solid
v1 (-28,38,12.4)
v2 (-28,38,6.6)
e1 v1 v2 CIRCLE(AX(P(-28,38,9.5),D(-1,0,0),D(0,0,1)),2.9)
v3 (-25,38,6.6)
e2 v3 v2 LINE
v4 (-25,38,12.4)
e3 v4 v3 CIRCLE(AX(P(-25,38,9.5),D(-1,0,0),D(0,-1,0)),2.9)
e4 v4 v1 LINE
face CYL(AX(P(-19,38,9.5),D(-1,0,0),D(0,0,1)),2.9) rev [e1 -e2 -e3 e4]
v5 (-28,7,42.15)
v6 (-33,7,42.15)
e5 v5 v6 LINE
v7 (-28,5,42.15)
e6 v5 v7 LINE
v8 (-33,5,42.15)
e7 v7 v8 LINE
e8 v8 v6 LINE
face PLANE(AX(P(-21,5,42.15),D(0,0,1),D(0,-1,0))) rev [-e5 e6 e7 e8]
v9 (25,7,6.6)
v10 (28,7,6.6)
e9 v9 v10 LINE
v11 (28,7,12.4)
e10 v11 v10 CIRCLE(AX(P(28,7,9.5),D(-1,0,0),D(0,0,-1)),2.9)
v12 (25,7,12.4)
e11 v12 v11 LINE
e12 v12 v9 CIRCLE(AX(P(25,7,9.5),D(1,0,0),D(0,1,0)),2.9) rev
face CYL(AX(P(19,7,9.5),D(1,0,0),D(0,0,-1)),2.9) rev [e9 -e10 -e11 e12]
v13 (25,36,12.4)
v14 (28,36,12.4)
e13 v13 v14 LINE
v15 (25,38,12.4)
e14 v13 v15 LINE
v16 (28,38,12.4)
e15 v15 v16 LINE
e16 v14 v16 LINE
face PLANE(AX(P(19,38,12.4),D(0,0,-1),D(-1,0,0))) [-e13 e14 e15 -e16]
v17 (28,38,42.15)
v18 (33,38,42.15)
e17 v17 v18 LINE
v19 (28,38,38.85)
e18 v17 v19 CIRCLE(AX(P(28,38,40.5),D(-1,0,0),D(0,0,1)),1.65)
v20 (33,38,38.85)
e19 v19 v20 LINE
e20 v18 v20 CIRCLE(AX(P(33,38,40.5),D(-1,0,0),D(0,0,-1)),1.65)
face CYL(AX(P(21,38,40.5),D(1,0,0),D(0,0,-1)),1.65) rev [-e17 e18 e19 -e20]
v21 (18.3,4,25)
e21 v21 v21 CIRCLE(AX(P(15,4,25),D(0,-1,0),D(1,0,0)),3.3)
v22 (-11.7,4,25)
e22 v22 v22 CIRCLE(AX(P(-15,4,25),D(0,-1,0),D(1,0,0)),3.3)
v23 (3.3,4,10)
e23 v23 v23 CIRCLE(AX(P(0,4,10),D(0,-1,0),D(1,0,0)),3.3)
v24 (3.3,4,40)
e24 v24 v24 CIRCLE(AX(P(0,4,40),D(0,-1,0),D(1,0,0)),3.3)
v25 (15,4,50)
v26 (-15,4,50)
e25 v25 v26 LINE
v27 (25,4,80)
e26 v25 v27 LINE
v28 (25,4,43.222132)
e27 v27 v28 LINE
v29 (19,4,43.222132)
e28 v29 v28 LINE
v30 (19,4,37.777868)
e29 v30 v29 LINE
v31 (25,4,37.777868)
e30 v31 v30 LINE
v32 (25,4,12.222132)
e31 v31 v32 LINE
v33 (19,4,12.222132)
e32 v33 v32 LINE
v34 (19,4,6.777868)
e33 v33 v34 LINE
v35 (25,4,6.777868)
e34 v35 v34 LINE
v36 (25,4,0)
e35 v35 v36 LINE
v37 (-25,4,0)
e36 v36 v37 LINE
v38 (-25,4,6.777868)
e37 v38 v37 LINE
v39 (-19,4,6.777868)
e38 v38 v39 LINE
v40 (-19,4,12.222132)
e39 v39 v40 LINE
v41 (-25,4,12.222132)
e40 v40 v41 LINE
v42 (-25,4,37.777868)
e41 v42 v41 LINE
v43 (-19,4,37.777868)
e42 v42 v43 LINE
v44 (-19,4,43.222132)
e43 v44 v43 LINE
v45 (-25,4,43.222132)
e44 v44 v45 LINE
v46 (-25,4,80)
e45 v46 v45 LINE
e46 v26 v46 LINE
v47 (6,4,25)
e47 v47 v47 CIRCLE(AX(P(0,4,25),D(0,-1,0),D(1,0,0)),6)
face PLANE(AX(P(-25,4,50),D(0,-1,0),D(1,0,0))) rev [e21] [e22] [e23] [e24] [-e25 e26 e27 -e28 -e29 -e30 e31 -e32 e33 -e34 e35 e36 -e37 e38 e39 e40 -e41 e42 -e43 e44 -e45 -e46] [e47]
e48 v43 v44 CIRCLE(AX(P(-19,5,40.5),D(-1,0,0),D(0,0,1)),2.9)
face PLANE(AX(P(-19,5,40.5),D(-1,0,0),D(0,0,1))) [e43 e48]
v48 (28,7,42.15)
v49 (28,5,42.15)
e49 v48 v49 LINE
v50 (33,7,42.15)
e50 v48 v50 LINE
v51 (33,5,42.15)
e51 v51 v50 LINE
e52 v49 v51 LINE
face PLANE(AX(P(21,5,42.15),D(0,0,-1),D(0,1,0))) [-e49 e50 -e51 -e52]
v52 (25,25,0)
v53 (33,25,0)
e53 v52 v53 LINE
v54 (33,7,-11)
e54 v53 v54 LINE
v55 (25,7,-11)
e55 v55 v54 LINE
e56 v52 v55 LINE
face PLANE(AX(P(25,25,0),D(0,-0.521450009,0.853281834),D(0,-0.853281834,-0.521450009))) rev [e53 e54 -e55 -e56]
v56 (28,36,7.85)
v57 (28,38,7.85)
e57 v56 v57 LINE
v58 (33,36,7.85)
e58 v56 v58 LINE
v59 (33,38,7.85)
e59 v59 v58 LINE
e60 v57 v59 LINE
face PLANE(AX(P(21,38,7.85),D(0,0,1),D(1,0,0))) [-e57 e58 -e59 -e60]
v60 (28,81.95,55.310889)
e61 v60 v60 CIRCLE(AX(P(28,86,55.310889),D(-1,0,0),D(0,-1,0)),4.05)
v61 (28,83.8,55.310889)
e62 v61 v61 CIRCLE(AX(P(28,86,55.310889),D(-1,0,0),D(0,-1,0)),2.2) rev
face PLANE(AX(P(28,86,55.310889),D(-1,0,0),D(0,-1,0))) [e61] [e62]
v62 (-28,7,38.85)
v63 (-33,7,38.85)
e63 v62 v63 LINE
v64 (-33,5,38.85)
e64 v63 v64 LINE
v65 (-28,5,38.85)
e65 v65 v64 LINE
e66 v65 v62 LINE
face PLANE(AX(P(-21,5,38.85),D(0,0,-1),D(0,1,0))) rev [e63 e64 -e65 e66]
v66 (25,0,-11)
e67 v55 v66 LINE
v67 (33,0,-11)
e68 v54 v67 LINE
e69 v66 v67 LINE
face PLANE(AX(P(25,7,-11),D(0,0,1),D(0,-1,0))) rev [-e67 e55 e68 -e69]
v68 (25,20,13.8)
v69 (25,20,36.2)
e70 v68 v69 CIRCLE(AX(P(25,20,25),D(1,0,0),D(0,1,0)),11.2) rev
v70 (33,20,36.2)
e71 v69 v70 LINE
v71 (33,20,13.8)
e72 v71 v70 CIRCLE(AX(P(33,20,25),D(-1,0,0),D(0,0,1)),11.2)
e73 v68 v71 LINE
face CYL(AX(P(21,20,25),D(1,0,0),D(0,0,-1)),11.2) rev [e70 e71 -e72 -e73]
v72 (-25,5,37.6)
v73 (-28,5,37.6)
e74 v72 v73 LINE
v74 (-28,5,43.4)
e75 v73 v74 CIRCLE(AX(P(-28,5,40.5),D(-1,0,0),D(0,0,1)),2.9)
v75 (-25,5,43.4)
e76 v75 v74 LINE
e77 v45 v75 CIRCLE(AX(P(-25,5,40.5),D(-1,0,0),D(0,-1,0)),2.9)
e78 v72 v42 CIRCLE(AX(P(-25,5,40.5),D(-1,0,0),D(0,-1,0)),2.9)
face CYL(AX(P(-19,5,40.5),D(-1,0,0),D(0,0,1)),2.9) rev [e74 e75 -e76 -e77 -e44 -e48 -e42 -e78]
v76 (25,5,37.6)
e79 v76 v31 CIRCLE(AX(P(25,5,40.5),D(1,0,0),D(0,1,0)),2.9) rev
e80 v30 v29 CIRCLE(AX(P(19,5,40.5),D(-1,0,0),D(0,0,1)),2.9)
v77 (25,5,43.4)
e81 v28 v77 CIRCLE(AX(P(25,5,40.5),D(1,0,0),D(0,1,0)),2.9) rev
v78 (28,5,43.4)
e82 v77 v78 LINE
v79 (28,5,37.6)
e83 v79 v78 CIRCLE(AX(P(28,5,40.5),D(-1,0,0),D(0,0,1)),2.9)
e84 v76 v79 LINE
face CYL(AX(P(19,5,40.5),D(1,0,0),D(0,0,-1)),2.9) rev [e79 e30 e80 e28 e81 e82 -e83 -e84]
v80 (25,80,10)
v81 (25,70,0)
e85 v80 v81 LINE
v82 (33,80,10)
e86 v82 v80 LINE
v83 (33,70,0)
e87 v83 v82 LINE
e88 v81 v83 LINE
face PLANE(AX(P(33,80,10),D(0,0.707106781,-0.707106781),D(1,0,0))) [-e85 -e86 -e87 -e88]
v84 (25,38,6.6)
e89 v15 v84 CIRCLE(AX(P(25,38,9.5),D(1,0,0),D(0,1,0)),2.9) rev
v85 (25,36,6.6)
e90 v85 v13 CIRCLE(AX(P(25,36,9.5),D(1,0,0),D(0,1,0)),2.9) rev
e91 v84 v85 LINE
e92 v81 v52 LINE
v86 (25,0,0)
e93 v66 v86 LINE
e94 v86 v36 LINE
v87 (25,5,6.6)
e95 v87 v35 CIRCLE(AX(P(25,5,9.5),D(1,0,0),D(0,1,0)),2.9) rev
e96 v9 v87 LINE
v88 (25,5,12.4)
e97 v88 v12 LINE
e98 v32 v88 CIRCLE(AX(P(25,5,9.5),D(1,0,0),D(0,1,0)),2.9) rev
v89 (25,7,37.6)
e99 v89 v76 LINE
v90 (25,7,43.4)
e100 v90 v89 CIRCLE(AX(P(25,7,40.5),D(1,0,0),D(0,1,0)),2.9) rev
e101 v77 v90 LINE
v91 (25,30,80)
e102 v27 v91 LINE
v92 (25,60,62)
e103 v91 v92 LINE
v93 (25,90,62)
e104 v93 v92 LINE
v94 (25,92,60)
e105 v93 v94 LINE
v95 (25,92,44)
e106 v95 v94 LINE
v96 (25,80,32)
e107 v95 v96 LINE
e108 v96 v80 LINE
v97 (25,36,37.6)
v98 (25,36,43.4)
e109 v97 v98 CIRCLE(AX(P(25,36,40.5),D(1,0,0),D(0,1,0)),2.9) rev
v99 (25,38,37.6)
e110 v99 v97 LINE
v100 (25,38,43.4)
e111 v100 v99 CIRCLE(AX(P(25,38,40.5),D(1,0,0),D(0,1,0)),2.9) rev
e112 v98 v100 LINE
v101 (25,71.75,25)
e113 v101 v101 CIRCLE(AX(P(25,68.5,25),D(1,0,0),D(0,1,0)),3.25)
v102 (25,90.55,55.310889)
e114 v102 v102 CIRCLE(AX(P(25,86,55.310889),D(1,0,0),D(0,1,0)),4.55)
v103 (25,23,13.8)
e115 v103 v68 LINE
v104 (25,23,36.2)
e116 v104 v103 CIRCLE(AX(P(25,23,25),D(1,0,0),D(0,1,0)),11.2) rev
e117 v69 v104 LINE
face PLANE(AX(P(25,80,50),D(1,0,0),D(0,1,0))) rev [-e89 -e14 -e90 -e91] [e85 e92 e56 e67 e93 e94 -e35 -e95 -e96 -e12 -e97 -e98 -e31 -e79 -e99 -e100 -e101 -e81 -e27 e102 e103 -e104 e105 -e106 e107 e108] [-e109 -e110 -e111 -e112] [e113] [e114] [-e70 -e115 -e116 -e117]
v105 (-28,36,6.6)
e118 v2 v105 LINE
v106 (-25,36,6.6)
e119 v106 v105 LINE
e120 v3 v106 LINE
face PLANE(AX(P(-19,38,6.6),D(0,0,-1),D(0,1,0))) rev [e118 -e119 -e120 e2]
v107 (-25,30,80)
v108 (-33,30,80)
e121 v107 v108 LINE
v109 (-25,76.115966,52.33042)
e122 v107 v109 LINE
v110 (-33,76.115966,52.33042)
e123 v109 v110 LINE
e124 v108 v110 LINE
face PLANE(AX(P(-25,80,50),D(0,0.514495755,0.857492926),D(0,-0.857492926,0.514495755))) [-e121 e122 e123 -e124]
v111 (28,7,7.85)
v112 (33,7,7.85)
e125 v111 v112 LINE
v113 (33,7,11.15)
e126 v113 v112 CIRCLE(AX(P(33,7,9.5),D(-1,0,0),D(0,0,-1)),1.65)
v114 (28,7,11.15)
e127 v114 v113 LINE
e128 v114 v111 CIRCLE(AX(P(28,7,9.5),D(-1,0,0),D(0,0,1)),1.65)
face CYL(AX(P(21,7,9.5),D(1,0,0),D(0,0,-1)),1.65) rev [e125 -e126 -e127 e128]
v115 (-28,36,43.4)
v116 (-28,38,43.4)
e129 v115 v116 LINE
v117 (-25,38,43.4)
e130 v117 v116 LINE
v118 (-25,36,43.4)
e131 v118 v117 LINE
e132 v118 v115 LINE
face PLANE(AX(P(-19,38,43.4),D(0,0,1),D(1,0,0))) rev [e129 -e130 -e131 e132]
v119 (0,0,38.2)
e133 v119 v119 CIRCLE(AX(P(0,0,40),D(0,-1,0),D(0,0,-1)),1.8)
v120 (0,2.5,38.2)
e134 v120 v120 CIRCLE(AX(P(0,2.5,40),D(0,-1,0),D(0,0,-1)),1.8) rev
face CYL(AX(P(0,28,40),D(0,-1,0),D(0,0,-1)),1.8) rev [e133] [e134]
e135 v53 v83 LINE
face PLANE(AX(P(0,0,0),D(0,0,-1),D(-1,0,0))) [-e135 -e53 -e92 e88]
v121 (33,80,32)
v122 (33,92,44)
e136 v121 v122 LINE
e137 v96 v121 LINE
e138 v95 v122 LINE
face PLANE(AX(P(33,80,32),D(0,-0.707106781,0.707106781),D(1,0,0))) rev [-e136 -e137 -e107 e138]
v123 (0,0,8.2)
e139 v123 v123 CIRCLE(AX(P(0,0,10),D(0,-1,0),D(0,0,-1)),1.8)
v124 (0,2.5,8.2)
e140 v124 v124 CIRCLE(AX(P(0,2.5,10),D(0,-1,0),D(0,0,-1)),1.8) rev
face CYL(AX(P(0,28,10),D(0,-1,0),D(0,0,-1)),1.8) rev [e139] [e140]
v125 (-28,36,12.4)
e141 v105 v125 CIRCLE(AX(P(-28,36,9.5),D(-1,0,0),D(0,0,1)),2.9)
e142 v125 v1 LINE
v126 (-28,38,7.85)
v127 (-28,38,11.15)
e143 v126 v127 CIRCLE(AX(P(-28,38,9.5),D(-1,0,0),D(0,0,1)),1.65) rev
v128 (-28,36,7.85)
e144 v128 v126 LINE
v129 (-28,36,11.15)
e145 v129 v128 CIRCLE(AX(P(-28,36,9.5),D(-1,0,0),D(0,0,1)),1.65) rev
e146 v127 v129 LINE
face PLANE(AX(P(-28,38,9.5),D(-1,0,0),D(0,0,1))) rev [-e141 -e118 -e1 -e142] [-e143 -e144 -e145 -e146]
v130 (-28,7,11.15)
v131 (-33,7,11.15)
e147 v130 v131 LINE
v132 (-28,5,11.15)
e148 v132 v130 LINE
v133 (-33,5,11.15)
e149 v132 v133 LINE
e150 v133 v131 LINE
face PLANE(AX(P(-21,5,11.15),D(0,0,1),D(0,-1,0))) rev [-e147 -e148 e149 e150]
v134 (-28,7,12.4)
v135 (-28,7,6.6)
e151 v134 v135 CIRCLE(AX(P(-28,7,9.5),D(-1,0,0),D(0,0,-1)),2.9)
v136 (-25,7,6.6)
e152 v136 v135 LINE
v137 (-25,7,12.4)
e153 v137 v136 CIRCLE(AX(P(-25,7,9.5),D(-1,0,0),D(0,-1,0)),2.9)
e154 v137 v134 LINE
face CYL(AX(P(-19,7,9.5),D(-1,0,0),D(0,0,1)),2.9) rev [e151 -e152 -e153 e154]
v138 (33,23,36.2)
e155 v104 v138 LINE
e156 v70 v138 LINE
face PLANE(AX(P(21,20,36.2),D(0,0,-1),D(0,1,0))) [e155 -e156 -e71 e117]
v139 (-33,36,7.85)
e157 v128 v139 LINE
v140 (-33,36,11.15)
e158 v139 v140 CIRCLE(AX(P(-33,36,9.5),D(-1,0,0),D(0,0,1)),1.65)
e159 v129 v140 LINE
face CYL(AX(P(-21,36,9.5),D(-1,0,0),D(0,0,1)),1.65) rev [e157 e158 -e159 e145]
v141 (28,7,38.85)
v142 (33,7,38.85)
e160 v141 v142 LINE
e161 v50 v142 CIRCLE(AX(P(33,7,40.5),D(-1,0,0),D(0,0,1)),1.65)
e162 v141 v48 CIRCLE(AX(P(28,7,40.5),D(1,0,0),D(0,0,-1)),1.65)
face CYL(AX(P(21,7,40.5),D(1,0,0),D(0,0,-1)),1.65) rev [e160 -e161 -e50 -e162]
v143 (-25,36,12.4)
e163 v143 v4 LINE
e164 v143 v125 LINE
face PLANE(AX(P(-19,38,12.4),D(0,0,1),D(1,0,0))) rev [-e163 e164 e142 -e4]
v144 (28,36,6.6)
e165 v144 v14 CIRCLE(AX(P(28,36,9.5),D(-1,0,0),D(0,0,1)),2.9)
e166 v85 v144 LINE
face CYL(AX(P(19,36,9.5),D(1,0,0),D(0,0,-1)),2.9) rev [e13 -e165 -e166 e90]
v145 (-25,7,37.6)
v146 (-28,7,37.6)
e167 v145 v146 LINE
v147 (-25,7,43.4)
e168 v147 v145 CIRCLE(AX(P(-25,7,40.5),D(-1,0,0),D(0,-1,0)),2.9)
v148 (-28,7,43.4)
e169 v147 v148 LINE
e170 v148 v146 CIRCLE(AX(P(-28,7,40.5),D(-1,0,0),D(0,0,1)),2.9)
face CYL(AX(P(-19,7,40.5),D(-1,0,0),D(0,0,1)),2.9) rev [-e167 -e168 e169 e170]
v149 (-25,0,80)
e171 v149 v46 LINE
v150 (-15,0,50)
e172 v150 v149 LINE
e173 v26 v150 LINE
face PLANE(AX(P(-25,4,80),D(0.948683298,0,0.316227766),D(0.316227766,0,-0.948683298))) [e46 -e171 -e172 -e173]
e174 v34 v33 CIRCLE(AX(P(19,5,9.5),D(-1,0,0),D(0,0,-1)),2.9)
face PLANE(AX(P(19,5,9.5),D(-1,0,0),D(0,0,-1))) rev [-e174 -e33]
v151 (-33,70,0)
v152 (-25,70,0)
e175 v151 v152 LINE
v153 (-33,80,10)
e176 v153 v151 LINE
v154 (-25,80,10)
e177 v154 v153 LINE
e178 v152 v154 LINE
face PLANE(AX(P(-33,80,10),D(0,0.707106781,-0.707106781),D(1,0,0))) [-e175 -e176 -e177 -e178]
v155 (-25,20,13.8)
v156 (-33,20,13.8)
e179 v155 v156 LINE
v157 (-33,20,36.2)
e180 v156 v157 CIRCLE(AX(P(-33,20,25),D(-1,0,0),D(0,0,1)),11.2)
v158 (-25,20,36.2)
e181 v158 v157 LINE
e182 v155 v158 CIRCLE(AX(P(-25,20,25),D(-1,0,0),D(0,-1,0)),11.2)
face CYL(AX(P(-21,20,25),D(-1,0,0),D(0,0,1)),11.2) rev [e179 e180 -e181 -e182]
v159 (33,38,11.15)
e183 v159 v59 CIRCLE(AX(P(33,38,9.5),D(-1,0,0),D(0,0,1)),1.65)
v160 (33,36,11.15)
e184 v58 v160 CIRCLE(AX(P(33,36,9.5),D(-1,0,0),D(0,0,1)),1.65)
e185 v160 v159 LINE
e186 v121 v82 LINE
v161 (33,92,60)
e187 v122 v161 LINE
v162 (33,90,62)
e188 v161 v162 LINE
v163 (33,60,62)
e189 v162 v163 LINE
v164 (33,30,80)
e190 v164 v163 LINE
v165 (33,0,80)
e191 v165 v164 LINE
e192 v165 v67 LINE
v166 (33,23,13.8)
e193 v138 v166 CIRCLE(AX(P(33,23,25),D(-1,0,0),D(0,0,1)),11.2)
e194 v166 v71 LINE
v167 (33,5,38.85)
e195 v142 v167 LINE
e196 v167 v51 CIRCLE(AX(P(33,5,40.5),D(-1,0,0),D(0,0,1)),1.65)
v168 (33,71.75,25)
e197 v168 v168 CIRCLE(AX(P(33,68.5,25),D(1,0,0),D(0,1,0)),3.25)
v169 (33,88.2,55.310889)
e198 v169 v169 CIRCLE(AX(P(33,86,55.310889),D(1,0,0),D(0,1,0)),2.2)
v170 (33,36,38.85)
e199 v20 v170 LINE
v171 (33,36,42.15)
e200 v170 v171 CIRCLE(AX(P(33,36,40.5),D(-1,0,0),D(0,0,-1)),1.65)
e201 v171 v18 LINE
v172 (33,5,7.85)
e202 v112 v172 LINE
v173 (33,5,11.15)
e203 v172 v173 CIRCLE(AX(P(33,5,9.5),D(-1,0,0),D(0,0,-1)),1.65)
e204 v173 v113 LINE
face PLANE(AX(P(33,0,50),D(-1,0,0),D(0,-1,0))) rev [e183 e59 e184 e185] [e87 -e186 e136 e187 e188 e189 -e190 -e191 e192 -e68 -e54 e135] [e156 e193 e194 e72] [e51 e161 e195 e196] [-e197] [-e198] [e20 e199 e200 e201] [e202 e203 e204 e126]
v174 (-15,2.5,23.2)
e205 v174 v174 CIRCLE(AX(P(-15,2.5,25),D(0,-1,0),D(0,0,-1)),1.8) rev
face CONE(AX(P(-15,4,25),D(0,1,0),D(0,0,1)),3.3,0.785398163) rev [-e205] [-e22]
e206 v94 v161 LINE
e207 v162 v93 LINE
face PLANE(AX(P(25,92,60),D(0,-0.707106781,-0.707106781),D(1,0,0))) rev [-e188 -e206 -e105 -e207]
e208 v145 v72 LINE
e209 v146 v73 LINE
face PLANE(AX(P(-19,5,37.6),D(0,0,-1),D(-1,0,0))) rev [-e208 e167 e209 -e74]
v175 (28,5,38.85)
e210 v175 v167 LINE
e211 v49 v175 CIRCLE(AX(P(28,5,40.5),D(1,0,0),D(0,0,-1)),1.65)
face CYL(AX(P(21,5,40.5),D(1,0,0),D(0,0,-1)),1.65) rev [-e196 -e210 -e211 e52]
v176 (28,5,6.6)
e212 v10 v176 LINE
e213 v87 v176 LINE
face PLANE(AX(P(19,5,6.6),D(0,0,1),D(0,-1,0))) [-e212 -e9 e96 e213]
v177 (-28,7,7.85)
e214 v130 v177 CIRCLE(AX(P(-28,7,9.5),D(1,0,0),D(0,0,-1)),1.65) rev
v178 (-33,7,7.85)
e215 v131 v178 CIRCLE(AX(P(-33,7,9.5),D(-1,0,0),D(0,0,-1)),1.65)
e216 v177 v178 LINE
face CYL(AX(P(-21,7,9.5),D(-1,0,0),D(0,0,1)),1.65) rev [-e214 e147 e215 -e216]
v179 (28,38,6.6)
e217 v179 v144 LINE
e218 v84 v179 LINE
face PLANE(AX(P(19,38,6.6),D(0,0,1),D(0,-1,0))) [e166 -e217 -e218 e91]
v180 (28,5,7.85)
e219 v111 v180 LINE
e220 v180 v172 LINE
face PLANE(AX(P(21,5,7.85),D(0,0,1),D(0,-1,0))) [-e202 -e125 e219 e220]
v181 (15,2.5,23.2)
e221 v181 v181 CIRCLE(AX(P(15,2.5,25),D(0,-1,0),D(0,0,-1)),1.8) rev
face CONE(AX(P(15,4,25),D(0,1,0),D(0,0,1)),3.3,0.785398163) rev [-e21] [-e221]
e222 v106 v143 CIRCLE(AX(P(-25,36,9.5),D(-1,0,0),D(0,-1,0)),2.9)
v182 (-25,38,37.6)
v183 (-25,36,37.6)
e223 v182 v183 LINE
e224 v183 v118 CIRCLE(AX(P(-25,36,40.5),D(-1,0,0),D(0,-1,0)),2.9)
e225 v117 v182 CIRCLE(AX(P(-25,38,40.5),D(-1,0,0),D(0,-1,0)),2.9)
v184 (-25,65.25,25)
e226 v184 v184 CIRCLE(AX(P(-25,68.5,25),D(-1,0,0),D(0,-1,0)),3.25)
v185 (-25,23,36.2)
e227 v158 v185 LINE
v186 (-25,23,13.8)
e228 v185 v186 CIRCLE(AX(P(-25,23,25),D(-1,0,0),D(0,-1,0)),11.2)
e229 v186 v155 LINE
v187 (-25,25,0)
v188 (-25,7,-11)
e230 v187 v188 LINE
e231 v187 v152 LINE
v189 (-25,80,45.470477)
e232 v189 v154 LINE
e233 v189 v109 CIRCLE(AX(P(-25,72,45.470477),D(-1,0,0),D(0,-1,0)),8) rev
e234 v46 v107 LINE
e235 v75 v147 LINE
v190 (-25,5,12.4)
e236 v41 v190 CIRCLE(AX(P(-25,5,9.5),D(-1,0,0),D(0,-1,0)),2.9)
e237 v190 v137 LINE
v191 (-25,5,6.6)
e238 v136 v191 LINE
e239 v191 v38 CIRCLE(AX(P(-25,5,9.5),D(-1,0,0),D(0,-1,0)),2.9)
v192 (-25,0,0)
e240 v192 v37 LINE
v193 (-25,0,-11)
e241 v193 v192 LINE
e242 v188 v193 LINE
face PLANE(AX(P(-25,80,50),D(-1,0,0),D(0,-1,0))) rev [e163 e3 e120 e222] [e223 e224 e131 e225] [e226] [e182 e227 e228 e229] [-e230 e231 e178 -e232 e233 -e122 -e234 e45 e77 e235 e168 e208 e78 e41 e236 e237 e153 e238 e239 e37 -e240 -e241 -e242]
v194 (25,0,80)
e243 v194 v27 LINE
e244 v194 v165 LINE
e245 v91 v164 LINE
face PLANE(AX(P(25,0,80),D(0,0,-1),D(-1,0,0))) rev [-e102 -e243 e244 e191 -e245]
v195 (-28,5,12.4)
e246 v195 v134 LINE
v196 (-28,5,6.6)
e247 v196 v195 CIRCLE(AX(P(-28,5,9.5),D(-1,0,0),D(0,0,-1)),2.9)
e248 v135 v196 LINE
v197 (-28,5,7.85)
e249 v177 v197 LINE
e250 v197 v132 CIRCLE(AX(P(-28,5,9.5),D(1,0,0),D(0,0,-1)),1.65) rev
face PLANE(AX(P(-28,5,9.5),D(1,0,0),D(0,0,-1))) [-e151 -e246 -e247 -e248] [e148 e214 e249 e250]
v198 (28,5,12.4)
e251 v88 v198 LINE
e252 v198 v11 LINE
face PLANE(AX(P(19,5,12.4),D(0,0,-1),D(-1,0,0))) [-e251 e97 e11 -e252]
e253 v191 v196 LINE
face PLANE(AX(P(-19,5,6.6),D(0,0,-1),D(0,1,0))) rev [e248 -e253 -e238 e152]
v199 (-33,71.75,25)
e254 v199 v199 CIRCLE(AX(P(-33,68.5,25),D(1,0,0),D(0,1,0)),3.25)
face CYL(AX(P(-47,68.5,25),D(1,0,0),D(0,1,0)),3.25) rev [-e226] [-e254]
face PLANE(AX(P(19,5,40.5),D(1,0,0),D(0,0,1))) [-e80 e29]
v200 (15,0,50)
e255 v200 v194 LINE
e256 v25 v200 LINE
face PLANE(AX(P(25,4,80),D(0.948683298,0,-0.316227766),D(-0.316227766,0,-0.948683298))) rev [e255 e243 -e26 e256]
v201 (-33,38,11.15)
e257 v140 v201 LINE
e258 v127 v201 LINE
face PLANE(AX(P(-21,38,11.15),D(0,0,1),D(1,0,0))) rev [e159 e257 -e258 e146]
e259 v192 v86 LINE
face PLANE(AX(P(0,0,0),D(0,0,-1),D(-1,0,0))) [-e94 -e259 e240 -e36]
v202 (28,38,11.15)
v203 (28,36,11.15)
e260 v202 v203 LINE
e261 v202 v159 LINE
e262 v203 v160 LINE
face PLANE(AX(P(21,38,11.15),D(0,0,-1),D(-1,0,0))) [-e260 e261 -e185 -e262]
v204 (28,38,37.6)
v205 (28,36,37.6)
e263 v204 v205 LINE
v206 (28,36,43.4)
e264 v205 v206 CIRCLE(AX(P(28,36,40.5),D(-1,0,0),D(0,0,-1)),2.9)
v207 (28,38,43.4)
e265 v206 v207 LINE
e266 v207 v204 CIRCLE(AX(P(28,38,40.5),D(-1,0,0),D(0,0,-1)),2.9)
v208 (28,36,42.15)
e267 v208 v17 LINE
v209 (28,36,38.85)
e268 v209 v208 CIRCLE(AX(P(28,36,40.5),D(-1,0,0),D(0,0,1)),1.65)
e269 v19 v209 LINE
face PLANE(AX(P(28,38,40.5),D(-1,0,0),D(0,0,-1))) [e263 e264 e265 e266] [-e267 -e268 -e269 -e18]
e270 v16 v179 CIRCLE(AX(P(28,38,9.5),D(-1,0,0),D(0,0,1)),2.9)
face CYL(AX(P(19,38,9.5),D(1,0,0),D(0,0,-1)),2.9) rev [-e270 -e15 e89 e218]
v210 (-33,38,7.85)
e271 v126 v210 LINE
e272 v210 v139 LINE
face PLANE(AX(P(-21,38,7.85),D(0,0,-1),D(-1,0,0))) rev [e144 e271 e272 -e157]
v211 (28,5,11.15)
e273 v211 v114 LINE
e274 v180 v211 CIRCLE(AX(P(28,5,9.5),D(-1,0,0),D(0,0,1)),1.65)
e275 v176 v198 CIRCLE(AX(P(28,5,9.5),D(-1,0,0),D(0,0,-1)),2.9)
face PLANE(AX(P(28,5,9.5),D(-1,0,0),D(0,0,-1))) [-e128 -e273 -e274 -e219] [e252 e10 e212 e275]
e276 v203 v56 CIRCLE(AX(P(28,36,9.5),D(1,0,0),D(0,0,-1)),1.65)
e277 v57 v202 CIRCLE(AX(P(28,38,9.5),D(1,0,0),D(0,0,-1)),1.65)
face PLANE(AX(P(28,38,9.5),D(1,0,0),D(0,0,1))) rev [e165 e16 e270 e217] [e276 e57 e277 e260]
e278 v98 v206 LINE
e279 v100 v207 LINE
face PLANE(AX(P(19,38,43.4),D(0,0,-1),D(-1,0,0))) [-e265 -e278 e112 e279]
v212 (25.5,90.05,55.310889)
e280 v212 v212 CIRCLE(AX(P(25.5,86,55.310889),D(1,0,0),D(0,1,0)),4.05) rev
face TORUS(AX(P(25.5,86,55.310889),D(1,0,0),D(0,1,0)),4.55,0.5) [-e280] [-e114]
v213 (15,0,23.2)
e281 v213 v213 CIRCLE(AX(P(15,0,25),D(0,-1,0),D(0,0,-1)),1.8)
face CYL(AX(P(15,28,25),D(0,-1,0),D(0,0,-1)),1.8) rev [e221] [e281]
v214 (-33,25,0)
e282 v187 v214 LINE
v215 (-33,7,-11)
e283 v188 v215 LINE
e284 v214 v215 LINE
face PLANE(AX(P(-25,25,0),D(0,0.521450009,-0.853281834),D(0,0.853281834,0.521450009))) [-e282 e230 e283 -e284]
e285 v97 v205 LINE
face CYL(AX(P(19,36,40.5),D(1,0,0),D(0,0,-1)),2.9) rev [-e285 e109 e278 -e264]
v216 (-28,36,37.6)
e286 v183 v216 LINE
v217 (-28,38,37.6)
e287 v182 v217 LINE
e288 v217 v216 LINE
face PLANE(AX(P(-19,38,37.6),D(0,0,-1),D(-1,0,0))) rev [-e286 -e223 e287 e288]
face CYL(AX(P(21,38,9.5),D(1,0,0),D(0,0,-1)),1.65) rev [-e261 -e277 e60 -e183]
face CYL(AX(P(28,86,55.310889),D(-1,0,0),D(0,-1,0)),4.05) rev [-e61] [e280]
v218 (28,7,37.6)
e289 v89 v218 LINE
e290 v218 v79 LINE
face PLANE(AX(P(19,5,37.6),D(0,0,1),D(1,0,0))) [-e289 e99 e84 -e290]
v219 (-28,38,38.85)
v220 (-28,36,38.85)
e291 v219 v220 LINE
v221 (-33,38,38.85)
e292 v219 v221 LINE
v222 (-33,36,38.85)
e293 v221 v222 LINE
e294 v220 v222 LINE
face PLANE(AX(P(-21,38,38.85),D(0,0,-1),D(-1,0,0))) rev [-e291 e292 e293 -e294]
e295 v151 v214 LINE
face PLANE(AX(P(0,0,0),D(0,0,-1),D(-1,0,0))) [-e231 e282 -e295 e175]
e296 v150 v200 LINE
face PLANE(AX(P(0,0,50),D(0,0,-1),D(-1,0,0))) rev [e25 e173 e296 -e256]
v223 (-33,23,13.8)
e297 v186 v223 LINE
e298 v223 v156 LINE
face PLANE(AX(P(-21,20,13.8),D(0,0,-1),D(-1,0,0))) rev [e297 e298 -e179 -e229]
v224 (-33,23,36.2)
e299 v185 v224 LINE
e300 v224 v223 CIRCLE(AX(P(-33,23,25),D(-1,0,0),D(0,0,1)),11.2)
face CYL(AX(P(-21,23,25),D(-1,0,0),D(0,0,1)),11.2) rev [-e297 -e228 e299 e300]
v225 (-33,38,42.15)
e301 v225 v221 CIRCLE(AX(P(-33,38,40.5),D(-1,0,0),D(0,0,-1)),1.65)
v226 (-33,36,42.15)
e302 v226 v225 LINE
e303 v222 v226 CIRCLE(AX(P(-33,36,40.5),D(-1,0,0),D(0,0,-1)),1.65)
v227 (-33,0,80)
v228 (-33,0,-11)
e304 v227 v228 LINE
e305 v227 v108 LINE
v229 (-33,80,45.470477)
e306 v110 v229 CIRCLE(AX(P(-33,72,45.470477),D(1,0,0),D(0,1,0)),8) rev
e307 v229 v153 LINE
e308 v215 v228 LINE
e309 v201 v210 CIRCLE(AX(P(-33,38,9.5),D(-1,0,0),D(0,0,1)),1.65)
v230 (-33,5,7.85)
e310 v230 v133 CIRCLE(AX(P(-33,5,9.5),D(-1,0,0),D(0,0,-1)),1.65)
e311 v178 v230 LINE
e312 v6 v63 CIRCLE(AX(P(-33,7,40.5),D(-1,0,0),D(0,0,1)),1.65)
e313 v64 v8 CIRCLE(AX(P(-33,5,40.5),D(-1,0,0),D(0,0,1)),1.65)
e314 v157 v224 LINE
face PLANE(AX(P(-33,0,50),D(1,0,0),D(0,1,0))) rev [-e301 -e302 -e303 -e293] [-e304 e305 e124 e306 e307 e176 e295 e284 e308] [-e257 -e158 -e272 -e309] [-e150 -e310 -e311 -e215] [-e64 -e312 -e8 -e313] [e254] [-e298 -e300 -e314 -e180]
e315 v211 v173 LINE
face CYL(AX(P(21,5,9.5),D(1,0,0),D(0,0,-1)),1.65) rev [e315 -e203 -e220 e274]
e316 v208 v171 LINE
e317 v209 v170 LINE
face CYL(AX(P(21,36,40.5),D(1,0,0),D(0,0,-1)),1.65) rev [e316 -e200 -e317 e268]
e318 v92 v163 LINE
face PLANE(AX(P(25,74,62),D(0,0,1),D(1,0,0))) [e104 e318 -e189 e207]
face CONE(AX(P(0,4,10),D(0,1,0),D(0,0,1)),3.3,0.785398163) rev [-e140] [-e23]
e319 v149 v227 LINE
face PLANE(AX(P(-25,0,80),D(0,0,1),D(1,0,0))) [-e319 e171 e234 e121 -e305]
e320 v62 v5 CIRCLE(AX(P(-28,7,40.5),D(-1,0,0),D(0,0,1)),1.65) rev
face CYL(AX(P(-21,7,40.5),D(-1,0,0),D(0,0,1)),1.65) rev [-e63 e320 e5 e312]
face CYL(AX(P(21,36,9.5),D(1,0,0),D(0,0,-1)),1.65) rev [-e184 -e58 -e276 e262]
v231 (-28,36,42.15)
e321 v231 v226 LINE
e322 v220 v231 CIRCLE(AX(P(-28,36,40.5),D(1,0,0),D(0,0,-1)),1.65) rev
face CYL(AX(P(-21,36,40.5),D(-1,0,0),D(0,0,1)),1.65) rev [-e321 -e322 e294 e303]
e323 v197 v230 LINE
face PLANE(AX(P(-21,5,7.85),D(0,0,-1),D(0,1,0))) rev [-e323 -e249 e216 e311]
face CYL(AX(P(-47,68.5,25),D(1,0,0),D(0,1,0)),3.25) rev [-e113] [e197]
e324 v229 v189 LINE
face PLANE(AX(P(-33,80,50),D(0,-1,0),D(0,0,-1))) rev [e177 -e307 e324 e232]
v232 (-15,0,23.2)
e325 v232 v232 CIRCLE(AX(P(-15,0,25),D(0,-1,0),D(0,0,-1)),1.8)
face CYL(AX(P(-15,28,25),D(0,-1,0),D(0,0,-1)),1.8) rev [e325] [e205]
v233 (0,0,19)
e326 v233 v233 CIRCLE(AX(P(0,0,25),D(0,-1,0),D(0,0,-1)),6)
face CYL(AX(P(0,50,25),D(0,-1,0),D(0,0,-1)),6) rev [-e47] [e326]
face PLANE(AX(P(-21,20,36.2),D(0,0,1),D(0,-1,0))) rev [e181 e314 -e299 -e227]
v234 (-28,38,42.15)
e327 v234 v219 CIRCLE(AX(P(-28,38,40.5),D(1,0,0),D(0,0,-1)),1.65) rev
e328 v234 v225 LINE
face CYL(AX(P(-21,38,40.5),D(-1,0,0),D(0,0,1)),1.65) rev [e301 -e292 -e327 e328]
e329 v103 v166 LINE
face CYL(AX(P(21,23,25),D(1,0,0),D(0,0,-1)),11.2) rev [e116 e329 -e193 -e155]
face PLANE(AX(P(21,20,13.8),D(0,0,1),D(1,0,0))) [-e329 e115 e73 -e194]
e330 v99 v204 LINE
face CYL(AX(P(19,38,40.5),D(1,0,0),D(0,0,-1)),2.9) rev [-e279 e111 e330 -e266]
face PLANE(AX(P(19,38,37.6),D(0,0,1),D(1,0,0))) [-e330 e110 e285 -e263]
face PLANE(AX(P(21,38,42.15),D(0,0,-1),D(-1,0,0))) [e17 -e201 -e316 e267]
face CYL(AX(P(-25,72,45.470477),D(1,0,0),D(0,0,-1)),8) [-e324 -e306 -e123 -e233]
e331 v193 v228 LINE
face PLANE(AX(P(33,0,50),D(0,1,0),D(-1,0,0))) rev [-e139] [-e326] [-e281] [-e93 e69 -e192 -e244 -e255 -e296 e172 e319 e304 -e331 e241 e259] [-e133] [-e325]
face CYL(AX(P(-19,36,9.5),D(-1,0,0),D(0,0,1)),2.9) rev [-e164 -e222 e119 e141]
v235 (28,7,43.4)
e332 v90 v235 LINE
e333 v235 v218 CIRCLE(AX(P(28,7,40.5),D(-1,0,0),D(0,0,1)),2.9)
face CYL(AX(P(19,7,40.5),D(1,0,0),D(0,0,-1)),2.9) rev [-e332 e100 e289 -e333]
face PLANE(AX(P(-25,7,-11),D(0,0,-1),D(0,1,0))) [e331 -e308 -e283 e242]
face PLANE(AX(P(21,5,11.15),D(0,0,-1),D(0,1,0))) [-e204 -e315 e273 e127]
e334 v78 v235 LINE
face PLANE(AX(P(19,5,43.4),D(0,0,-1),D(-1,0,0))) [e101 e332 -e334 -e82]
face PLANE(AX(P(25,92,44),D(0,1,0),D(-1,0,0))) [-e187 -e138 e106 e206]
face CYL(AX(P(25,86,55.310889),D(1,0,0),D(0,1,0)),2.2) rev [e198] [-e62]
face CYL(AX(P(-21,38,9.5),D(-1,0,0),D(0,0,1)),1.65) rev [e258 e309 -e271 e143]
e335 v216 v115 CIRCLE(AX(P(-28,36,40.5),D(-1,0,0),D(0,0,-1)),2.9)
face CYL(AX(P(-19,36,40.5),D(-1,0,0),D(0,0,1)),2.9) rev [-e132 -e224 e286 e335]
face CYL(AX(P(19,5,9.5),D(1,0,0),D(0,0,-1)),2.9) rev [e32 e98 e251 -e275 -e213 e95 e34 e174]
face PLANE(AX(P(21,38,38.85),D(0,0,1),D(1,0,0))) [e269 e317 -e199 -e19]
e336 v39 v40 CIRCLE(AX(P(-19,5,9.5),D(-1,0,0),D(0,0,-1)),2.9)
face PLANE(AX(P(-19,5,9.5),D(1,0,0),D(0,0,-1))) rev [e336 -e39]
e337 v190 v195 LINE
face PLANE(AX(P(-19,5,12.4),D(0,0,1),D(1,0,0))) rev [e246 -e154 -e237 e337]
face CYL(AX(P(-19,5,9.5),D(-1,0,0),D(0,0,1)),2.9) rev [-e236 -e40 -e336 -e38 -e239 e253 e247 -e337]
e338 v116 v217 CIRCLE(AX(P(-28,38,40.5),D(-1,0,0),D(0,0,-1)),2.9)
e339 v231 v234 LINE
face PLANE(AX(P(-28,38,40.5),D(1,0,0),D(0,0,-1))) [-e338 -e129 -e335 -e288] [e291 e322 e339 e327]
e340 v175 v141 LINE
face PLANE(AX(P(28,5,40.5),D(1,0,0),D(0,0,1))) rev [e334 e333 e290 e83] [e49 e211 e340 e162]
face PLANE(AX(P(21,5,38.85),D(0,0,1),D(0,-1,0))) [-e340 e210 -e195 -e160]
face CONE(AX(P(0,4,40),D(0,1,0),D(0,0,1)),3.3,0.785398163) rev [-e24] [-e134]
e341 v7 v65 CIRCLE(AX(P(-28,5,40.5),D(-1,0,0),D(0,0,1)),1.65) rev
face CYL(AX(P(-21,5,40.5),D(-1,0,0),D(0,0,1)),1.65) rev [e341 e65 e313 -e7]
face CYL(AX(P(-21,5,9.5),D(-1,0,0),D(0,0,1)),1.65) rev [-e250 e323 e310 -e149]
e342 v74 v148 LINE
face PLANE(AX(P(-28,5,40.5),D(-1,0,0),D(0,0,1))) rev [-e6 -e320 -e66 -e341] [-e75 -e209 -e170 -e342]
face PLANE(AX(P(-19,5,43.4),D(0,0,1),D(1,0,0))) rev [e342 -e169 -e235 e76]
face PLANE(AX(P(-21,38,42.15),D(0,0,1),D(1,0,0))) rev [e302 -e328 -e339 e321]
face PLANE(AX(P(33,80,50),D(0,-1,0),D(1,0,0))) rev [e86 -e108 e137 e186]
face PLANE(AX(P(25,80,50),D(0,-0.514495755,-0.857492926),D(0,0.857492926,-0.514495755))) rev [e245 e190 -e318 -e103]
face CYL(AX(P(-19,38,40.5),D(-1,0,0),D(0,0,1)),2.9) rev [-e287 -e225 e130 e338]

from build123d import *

# Parameters (mm, degrees)
EXTRUDE_1_DEPTH     = 50
SKETCH_3_R          = 6
CUT_EXTRUDE_1_DEPTH = 50
SKETCH_4_R          = 1.8
CUT_EXTRUDE_2_DEPTH = 28
CHAMFER_1_SIZE      = 1.5
CUT_EXTRUDE_3_DEPTH = 12
CUT_EXTRUDE_START   = -5
CUT_EXTRUDE_4_DEPTH = 9
SKETCH_10_R         = 3.25
CUT_EXTRUDE_5_DEPTH = 80
CHAMFER_2_SIZE      = 6
SKETCH_11_R         = 2.2
EXTRUDE_2_DEPTH     = 8
EXTRUDE_3_DEPTH     = 8
EXTRUDE_4_DEPTH     = 4
EXTRUDE_6_DEPTH     = 8
CHAMFER_3_SIZE      = 10
CHAMFER_4_SIZE      = 12
CHAMFER_5_SIZE      = 2
FILLET_1_R          = 8
SKETCH_17_R         = 4.05
CUT_EXTRUDE_6_DEPTH = 3
FILLET_2_R          = 0.5


with BuildPart() as part:
    # 草图1 → 凸台-拉伸1 (new body)
    with BuildSketch(Plane.XY):
        Polygon((33, 0), (-33, 0), (-33, 80), (-25, 80), (-25, 4), (25, 4), (25, 80), (33, 80), align=None)
    extrude(amount=EXTRUDE_1_DEPTH)

    # 草图3 → 切除-拉伸1 (cut)
    with BuildSketch(Plane.XZ):
        with Locations(Location((0, 25, 0), (0, 0, 270))):
            Circle(SKETCH_3_R)
    extrude(amount=-CUT_EXTRUDE_1_DEPTH, mode=Mode.SUBTRACT)

    # 草图4 → 切除-拉伸2 (cut)
    with BuildSketch(Plane.XZ):
        with Locations(Location((0, 40, 0), (0, 0, 270))):
            Circle(SKETCH_4_R)
        with Locations(Location((15, 25, 0), (0, 0, 270))):
            Circle(SKETCH_4_R)
        with Locations(Location((0, 10, 0), (0, 0, 270))):
            Circle(SKETCH_4_R)
        with Locations(Location((-15, 25, 0), (0, 0, 270))):
            Circle(SKETCH_4_R)
    extrude(amount=-CUT_EXTRUDE_2_DEPTH, mode=Mode.SUBTRACT)

    # 倒角1
    chamfer_1_edges = [part.edges().sort_by_distance(p)[0] for p in [
        (0, 4, 41.8),
        (15, 4, 26.8),
        (0, 4, 11.8),
        (-15, 4, 26.8),
    ]]
    chamfer(chamfer_1_edges, length=CHAMFER_1_SIZE)

    # 草图6 → 切除-拉伸3 (cut)
    with BuildSketch(Plane.ZY.offset(33)):
        with BuildLine():
            Line((13.8, 20), (13.8, 23))
            ThreePointArc((13.8, 23), (25, 34.2), (36.2, 23))
            Line((36.2, 23), (36.2, 20))
            ThreePointArc((36.2, 20), (25, 8.8), (13.8, 20))
        make_face()
        with BuildLine():
            Line((11.15, 38), (11.15, 36))
            ThreePointArc((11.15, 36), (9.5, 34.35), (7.85, 36))
            Line((7.85, 36), (7.85, 38))
            ThreePointArc((7.85, 38), (9.5, 39.65), (11.15, 38))
        make_face()
        with BuildLine():
            Line((38.85, 38), (38.85, 36))
            ThreePointArc((38.85, 36), (40.5, 34.35), (42.15, 36))
            Line((42.15, 36), (42.15, 38))
            ThreePointArc((42.15, 38), (40.5, 39.65), (38.85, 38))
        make_face()
        with BuildLine():
            Line((11.15, 5), (11.15, 7))
            ThreePointArc((11.15, 7), (9.5, 8.65), (7.85, 7))
            Line((7.85, 7), (7.85, 5))
            ThreePointArc((7.85, 5), (9.5, 3.35), (11.15, 5))
        make_face()
        with BuildLine():
            Line((38.85, 5), (38.85, 7))
            ThreePointArc((38.85, 7), (40.5, 8.65), (42.15, 7))
            Line((42.15, 7), (42.15, 5))
            ThreePointArc((42.15, 5), (40.5, 3.35), (38.85, 5))
        make_face()
    cut_extrude_3 = extrude(amount=-CUT_EXTRUDE_3_DEPTH, mode=Mode.SUBTRACT)

    # 草图9 → 切除-拉伸4 (cut)
    with BuildSketch(Plane.ZY.offset(33).offset(CUT_EXTRUDE_START)):
        with BuildLine():
            Line((12.4, 38), (12.4, 36))
            ThreePointArc((12.4, 36), (9.5, 33.1), (6.6, 36))
            Line((6.6, 36), (6.6, 38))
            ThreePointArc((6.6, 38), (9.5, 40.9), (12.4, 38))
        make_face()
        with BuildLine():
            Line((37.6, 38), (37.6, 36))
            ThreePointArc((37.6, 36), (40.5, 33.1), (43.4, 36))
            Line((43.4, 36), (43.4, 38))
            ThreePointArc((43.4, 38), (40.5, 40.9), (37.6, 38))
        make_face()
        with BuildLine():
            Line((37.6, 5), (37.6, 7))
            ThreePointArc((37.6, 7), (40.5, 9.9), (43.4, 7))
            Line((43.4, 7), (43.4, 5))
            ThreePointArc((43.4, 5), (40.5, 2.1), (37.6, 5))
        make_face()
        with BuildLine():
            Line((12.4, 5), (12.4, 7))
            ThreePointArc((12.4, 7), (9.5, 9.9), (6.6, 7))
            Line((6.6, 7), (6.6, 5))
            ThreePointArc((6.6, 5), (9.5, 2.1), (12.4, 5))
        make_face()
    cut_extrude_4 = extrude(amount=-CUT_EXTRUDE_4_DEPTH, mode=Mode.SUBTRACT)

    # 镜向1: 切除-拉伸3, 切除-拉伸4 across plane
    add(cut_extrude_3.mirror(Plane(origin=(0, 0, 0), x_dir=(0, 0, 1), z_dir=(1, 0, 0))), mode=Mode.SUBTRACT)
    add(cut_extrude_4.mirror(Plane(origin=(0, 0, 0), x_dir=(0, 0, 1), z_dir=(1, 0, 0))), mode=Mode.SUBTRACT)

    # 草图10 → 切除-拉伸5 (cut)
    with BuildSketch(Plane(origin=(33, 0, 0), x_dir=(0, 0, -1), z_dir=(1, 0, 0))):
        with Locations(Location((-25, 68.5, 0), (0, 0, 90))):
            Circle(SKETCH_10_R)
    extrude(amount=-CUT_EXTRUDE_5_DEPTH, mode=Mode.SUBTRACT)

    # 倒角2
    chamfer_2_edges = [part.edges().sort_by_distance(p)[0] for p in [
        (29, 80, 50),
    ]]
    chamfer(chamfer_2_edges, length=CHAMFER_2_SIZE)

    # 草图11 → 凸台-拉伸2 (add)
    with BuildSketch(Plane(origin=(33, 0, 0), x_dir=(0, 0, -1), z_dir=(1, 0, 0))):
        Polygon((-50, 63.445571485), (-50, 74), (-44, 80), (-44, 92), (-62, 92), (-62, 74), (-62, 54.790404535), (-50, 54.790404535), align=None)
        with Locations(Location((-55.310889132, 86, 0), (0, 0, 90))):
            Circle(SKETCH_11_R, mode=Mode.SUBTRACT)
    extrude(amount=-EXTRUDE_2_DEPTH)

    # 草图13 → 凸台-拉伸3 (add)
    with BuildSketch(Plane.ZY.offset(33)):
        Polygon((50, 80), (80, 30), (80, 0), (50, 0), align=None)
    extrude_3 = extrude(amount=-EXTRUDE_3_DEPTH)

    # 镜向2: 凸台-拉伸3 across plane
    add(extrude_3.mirror(Plane(origin=(0, 0, 0), x_dir=(0, 0, 1), z_dir=(1, 0, 0))))

    # 草图14 → 凸台-拉伸4 (add)
    with BuildSketch(Plane.XZ):
        Polygon((-25, 80), (-15, 50), (-25, 50), align=None)
    extrude_4 = extrude(amount=-EXTRUDE_4_DEPTH)

    # 镜向3: 凸台-拉伸4 across plane
    add(extrude_4.mirror(Plane(origin=(0, 0, 0), x_dir=(0, 0, 1), z_dir=(1, 0, 0))))

    # 草图16 → 凸台-拉伸6 (add)
    with BuildSketch(Plane.ZY.offset(33)):
        Polygon((0, 25), (-11, 7), (-11, 0), (0, 0), align=None)
    extrude_6 = extrude(amount=-EXTRUDE_6_DEPTH)

    # 镜向5: 凸台-拉伸6 across plane
    add(extrude_6.mirror(Plane(origin=(0, 0, 0), x_dir=(0, 0, 1), z_dir=(1, 0, 0))))

    # 倒角3
    chamfer_3_edges = [part.edges().sort_by_distance(p)[0] for p in [
        (29, 80, 0),
        (-29, 80, 0),
    ]]
    chamfer(chamfer_3_edges, length=CHAMFER_3_SIZE)

    # 倒角4
    chamfer_4_edges = [part.edges().sort_by_distance(p)[0] for p in [
        (29, 80, 44),
    ]]
    chamfer(chamfer_4_edges, length=CHAMFER_4_SIZE - 0.0001)  # a hair under: the kernel refuses the full size

    # 倒角5
    chamfer_5_edges = [part.edges().sort_by_distance(p)[0] for p in [
        (29, 92, 62),
    ]]
    chamfer(chamfer_5_edges, length=CHAMFER_5_SIZE)

    # 圆角1
    fillet_1_edges = [part.edges().sort_by_distance(p)[0] for p in [
        (-29, 80, 50),
    ]]
    fillet(fillet_1_edges, radius=FILLET_1_R)

    # 草图17 → 切除-拉伸6 (cut)
    with BuildSketch(Plane.ZY.offset(-25)):
        with Locations(Location((55.310889132, 86, 0), (0, 0, 270))):
            Circle(SKETCH_17_R)
    extrude(amount=-CUT_EXTRUDE_6_DEPTH, mode=Mode.SUBTRACT)

    # 圆角2
    fillet_2_edges = [part.edges().sort_by_distance(p)[0] for p in [
        (25, 90.05, 55.310889132),
    ]]
    fillet(fillet_2_edges, radius=FILLET_2_R)


solid = part.part
